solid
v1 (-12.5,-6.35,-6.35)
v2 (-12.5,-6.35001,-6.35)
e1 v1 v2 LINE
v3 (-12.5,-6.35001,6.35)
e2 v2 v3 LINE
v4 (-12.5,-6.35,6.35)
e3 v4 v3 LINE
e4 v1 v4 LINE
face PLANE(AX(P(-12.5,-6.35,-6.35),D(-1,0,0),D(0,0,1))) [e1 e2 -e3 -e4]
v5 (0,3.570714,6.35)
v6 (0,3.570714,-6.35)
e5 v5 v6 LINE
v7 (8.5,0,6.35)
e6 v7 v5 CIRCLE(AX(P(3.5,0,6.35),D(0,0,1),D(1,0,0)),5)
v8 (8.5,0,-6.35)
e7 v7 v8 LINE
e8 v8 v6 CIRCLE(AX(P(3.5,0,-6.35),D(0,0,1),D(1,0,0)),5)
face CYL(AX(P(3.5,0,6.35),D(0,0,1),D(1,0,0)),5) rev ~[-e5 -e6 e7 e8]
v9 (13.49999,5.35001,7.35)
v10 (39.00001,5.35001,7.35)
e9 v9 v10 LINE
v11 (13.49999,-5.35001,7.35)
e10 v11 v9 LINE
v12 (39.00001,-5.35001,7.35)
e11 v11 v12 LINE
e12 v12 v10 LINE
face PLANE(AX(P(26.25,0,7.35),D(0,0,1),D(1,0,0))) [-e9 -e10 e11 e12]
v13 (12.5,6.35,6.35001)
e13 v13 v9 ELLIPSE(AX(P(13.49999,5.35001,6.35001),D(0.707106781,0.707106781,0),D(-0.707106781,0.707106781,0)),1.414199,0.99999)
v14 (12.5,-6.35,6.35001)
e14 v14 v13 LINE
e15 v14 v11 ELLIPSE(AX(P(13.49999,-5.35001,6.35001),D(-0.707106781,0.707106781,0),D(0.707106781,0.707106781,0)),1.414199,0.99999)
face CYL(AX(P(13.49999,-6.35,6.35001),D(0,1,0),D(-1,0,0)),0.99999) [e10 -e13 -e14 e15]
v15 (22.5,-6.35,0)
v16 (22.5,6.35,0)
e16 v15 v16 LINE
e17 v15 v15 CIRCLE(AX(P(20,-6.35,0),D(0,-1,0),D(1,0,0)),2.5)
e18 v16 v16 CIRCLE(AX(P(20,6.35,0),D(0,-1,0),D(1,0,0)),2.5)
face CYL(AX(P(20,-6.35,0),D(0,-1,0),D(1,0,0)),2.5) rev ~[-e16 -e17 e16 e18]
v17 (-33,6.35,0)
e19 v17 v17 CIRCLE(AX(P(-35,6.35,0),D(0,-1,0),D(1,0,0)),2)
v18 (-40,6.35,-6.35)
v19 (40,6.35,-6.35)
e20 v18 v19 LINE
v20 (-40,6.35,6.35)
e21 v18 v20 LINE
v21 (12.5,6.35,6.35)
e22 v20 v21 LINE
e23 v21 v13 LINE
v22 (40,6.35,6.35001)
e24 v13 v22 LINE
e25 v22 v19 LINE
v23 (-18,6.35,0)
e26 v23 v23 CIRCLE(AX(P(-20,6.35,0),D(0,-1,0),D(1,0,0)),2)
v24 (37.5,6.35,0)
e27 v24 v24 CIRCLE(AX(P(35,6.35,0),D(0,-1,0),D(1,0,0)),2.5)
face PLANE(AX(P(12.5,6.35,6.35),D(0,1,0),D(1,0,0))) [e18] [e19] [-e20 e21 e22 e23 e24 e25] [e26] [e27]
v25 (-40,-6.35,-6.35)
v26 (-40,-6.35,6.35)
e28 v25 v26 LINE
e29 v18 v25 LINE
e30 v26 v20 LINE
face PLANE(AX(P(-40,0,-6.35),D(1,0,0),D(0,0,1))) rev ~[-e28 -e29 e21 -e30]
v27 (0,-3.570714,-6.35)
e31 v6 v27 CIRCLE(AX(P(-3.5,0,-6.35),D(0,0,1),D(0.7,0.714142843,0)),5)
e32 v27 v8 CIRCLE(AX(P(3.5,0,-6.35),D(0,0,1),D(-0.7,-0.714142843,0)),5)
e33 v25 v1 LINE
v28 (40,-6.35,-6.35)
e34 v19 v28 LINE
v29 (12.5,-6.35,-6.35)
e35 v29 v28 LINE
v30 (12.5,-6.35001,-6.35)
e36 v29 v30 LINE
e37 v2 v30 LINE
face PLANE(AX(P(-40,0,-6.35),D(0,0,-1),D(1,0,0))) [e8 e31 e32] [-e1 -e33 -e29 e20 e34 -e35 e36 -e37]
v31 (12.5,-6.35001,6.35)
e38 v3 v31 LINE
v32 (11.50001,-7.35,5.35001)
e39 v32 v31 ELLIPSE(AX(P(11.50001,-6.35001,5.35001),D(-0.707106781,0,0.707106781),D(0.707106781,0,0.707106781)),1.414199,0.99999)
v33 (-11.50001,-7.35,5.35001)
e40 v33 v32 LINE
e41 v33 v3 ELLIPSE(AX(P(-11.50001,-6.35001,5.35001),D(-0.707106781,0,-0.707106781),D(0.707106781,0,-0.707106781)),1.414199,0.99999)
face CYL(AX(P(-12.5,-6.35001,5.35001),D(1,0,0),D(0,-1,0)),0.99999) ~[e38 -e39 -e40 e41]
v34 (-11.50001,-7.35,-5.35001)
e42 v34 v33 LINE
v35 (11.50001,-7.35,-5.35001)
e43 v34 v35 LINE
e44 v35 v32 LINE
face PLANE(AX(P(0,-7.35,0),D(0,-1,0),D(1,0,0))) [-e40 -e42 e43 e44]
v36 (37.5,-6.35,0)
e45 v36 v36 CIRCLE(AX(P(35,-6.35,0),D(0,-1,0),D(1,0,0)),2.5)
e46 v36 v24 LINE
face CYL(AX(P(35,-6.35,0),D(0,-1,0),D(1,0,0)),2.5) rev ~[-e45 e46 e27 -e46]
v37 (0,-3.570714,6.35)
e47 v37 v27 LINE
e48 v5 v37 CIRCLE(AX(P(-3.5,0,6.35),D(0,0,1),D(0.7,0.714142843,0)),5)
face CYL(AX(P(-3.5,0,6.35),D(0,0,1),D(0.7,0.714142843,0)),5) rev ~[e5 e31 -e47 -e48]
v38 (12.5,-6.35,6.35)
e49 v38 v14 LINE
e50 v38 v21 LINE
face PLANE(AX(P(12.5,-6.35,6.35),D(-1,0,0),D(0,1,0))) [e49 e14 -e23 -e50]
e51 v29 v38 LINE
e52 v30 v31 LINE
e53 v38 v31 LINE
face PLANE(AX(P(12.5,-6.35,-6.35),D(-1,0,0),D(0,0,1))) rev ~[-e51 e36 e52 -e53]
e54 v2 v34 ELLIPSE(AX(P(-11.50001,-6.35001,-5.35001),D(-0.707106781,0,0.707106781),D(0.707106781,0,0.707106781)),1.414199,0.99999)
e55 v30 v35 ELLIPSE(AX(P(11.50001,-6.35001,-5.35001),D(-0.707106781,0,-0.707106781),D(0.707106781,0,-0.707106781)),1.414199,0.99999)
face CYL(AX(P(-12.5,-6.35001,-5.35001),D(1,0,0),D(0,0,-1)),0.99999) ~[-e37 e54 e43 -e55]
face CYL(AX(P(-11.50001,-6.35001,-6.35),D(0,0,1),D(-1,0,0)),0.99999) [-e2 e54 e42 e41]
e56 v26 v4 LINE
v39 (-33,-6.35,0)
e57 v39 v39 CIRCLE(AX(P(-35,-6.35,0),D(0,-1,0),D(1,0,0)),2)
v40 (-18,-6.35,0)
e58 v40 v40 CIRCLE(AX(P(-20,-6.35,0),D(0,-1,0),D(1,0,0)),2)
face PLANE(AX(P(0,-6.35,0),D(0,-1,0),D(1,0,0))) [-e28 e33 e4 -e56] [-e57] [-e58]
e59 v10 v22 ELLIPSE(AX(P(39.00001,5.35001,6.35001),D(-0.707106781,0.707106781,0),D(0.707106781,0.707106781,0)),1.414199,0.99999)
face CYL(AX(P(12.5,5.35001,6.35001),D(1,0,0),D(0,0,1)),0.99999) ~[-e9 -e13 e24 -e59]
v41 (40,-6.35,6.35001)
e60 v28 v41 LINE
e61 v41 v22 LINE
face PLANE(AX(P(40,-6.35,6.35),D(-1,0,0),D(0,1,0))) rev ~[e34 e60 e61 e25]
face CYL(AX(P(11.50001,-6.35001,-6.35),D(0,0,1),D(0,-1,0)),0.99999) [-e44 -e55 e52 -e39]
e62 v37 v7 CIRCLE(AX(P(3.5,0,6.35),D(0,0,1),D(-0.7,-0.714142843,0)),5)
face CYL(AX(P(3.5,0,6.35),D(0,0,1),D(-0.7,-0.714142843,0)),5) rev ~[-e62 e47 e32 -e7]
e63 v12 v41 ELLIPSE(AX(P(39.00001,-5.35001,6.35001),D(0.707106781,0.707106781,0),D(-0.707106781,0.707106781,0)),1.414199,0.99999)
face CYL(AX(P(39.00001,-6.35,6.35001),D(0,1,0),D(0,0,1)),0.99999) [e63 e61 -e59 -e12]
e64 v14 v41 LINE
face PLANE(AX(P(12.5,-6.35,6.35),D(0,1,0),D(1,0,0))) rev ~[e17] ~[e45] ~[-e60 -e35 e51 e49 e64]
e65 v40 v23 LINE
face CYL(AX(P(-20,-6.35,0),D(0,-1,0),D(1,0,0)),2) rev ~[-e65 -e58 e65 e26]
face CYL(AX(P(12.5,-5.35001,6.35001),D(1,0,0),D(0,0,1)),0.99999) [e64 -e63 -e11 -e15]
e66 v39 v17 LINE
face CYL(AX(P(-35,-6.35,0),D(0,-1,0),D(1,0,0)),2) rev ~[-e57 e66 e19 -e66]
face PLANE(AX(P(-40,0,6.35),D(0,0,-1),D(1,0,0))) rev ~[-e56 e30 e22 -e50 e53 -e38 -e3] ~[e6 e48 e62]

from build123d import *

# Parameters (mm, degrees)
F0_W     = 80
F0_H     = 12.7
F1_DEPTH = 6.35
F2_R     = 2
F2_R_2   = 2.5
F3_DEPTH = 12.701
F5_DEPTH = 12.701
F6_W     = 25
F6_H     = 12.7
F7_DEPTH = 1
F8_W     = 27.5
F8_H     = 12.7
F9_DEPTH = 1
F10_R    = 0.99999


# Not quite as in the source:
# - a fillet or chamfer is up to 0.001 mm smaller than in the source, because OpenCascade refuses the exact size


with BuildPart() as f1:
    # F0 (on Front) → F1 (new body, symmetric)
    with BuildSketch(Plane.XZ):
        Rectangle(F0_W, F0_H)
    extrude(amount=F1_DEPTH, both=True)

    # F2 (on face) → F3 (cut, through all)
    with BuildSketch(Plane.XZ.offset(6.35)):
        with Locations((-35, 0)):
            Circle(F2_R)
        with Locations((-20, 0)):
            Circle(F2_R)
        with Locations((35, 0)):
            Circle(F2_R_2)
        with Locations((20, 0)):
            Circle(F2_R_2)
    extrude(amount=-F3_DEPTH, mode=Mode.SUBTRACT)

    # F4 (on face) → F5 (cut, through all)
    with BuildSketch(Plane.XY.offset(6.35)):
        with BuildLine():
            ThreePointArc((0, -3.5707142143), (5.4364916731, -4.6097722286), (8.5, 0))
            ThreePointArc((8.5, 0), (5.4364916731, 4.6097722286), (0, 3.5707142143))
            ThreePointArc((0, 3.5707142143), (1.1097722286, 1.9364916731), (1.5, 0))
            ThreePointArc((1.5, 0), (1.1097722286, -1.9364916731), (0, -3.5707142143))
        make_face()
        with BuildLine():
            ThreePointArc((1.5, 0), (1.1097722286, 1.9364916731), (0, 3.5707142143))
            ThreePointArc((0, 3.5707142143), (-1.5, 0), (0, -3.5707142143))
            ThreePointArc((0, -3.5707142143), (1.1097722286, -1.9364916731), (1.5, 0))
        make_face()
        with BuildLine():
            ThreePointArc((0, -3.5707142143), (-1.5, 0), (0, 3.5707142143))
            ThreePointArc((0, 3.5707142143), (-8.5, 0), (0, -3.5707142143))
        make_face()
    extrude(amount=-F5_DEPTH, mode=Mode.SUBTRACT)

    # F6 (on face) → F7 (join)
    with BuildSketch(Plane.XZ.offset(6.35)):
        Rectangle(F6_W, F6_H)
    extrude(amount=F7_DEPTH)

    # F8 (on face) → F9 (join)
    with BuildSketch(Plane.XY.offset(6.35)):
        with Locations((26.25, 0)):
            Rectangle(F8_W, F8_H)
    extrude(amount=F9_DEPTH)

    # F10 (radius 1 in the source; OpenCascade refuses exactly that, so slightly less here)
    f10_edges = [f1.edges().sort_by_distance(p)[0] for p in [
        (12.5, 0, 7.35),
        (40, 0, 7.35),
        (0, -7.35, 6.35),
        (0, -7.35, -6.35),
        (12.5, -7.35, 0),
        (-12.5, -7.35, 0),
        (26.25, 6.35, 7.35),
        (26.25, -6.35, 7.35),
    ]]
    fillet(f10_edges, radius=F10_R)


solid = f1.part
